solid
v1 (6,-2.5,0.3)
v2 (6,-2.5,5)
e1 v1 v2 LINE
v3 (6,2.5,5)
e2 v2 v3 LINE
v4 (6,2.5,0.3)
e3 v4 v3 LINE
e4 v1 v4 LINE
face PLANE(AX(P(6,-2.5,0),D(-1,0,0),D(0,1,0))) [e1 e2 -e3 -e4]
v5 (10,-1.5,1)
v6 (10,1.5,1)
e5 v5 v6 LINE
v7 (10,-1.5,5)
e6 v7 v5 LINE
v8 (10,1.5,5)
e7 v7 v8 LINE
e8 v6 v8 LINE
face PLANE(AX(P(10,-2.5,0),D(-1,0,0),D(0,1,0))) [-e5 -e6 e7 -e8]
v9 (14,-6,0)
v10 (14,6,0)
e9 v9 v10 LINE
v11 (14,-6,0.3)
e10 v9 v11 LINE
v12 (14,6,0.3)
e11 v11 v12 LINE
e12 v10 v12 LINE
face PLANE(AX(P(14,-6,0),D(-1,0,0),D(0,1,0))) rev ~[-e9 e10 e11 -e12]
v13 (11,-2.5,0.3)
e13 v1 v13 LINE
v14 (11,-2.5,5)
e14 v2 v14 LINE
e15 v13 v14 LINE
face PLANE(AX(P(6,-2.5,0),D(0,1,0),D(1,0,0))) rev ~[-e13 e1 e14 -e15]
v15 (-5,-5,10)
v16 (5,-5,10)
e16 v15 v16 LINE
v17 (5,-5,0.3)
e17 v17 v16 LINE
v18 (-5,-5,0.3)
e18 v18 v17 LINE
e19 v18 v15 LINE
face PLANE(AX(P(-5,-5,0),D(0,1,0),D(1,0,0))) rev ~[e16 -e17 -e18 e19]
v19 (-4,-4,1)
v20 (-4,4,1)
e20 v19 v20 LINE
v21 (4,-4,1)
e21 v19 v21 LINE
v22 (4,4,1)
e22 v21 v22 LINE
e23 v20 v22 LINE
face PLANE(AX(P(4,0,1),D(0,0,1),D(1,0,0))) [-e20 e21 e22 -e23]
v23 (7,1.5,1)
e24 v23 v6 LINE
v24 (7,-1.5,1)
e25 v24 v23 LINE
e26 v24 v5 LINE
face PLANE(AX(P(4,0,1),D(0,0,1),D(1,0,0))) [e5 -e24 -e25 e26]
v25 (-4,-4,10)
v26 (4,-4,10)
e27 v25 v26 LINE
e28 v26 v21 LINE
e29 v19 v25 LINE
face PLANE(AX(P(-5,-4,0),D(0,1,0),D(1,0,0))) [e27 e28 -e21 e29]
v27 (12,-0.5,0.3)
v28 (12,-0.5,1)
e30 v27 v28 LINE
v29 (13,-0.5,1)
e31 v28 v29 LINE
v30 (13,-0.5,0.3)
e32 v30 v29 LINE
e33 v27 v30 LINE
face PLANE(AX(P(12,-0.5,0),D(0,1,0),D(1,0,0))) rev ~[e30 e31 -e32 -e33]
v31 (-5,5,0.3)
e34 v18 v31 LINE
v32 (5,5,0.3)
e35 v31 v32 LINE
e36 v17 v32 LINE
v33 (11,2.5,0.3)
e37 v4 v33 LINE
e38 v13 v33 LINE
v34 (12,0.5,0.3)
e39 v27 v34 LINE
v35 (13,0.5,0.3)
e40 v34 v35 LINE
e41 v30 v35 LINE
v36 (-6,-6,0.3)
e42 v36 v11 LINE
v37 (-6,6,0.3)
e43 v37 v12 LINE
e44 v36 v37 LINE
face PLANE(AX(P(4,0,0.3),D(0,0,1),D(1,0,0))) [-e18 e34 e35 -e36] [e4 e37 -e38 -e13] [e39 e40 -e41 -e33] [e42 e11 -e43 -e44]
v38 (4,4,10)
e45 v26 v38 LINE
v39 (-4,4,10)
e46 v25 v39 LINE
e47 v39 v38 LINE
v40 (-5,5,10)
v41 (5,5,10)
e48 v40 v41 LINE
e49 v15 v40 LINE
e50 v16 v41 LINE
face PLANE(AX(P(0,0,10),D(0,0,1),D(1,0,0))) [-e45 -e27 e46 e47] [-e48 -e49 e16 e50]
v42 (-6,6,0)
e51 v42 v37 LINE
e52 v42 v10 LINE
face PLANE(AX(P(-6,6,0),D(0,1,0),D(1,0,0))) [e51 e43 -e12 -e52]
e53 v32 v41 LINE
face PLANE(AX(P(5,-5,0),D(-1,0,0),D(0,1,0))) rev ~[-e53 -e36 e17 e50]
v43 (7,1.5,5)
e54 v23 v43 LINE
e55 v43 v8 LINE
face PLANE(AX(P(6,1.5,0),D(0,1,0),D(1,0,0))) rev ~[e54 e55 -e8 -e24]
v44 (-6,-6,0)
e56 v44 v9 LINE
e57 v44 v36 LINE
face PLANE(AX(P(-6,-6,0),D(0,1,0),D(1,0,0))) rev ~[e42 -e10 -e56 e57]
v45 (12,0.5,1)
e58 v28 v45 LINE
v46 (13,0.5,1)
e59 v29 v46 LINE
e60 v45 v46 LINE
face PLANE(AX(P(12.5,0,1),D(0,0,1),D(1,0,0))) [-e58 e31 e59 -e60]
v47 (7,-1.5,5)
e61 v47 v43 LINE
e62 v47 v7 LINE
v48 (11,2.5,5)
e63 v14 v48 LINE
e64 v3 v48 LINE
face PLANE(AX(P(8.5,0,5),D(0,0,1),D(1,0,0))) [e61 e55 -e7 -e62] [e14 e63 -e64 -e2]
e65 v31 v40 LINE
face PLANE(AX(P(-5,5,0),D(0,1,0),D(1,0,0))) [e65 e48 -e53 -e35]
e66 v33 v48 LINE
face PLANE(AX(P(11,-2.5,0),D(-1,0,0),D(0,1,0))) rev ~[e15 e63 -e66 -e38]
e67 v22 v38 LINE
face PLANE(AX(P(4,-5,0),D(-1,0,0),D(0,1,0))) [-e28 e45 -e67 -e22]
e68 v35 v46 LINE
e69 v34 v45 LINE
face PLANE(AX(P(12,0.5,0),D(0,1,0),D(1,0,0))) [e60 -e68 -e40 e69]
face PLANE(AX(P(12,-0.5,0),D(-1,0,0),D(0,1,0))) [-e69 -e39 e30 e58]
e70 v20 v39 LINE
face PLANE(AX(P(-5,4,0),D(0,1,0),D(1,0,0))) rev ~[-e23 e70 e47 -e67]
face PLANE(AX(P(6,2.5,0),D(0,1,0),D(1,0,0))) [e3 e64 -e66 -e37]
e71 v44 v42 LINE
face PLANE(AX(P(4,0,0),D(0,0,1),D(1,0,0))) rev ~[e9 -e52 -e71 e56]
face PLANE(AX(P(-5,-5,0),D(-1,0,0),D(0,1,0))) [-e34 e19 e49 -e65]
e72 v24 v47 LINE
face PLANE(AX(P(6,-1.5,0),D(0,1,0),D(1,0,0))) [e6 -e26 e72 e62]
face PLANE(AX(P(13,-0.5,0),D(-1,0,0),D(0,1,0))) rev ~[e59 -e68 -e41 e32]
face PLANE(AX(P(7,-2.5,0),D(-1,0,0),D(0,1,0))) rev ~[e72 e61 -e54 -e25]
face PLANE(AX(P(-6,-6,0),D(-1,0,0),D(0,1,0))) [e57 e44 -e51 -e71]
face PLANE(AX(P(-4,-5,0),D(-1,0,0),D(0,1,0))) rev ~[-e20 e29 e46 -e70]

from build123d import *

# Parameters (mm, degrees)
F0_W         = 10
F0_H         = 10
F1_DEPTH     = 10
F0_W_2       = 5
F0_H_2       = 5
F2_DEPTH     = 5
F0_W_3       = 1
F0_H_3       = 1
F3_DEPTH     = 1
F0_W_4       = 20
F0_H_4       = 12
F4_DEPTH     = 0.3
F5_T         = 1
F5_T3_DEPTH  = 3
F5_T5_DEPTH  = 12
F5_T7_DEPTH  = 12
F5_T9_DEPTH  = 7
F5_T11_DEPTH = 7
F5_T13_DEPTH = 3


# Not quite as in the source:
# - a shell that OpenCascade refuses in one call is made with other operations: the cavity is built on its own and cut out


with BuildPart() as f1:
    # F0 (on Top) → F1 (new body)
    with BuildSketch(Plane.XY):
        Rectangle(F0_W, F0_H)
    extrude(amount=F1_DEPTH)



with BuildPart() as f2:
    # F0 (on Top) → F2 (new body)
    with BuildSketch(Plane.XY):
        with Locations((8.5, 0)):
            Rectangle(F0_W_2, F0_H_2)
    extrude(amount=F2_DEPTH)


with BuildPart() as f3:
    # F0 (on Top) → F3 (new body)
    with BuildSketch(Plane.XY):
        with Locations((12.5, 0)):
            Rectangle(F0_W_3, F0_H_3)
    extrude(amount=F3_DEPTH)


with BuildPart() as f1_1:
    add(f1.part)

    add(f2.part)  # F4 merges F2

    add(f3.part)  # F4 merges F3
    # F0 (on Top) → F4 (join)
    with BuildSketch(Plane.XY):
        with Locations((4, 0)):
            Rectangle(F0_W_4, F0_H_4)
        Rectangle(F0_W, F0_H, mode=Mode.SUBTRACT)
        with Locations((8.5, 0)):
            Rectangle(F0_W_2, F0_H_2, mode=Mode.SUBTRACT)
        with Locations((12.5, 0)):
            Rectangle(F0_W_3, F0_H_3, mode=Mode.SUBTRACT)
    extrude(amount=F4_DEPTH)

    # F5: shell of thickness 1, made by hand


with BuildPart() as f5_core1:
    # F5_t2: copy of F1
    add(f1_1.part)

    # the walls: a layer under each face that stays
    f5_faces = [f5_core1.faces().sort_by_distance(p)[0] for p in [
        (13, 0, 0.65),
        (10.6666666667, -4, 0.3),
        (12.5, 0.5, 0.65),
        (12.5, -0.5, 0.65),
        (4, 6, 0.15),
        (-6, 0, 0.15),
        (4, -6, 0.15),
        (14, 0, 0.15),
        (0, 5, 5.15),
        (5, 0, 5.15),
        (0, -5, 5.15),
        (-5, 0, 5.15),
        (8.5, 2.5, 2.65),
        (11, 0, 2.65),
        (8.5, -2.5, 2.65),
        (6, 0, 2.65),
        (12, 0, 0.65),
        (4, 0, 0),
    ]]
    thicken(f5_faces, amount=-F5_T, mode=Mode.SUBTRACT)

    # F5_s4 → F5_t3 (cut)
    with BuildSketch(Plane.XZ.offset(-1.5)):
        Polygon((13.01, 0.31), (12, 0.3), (12, -0.7), (13, -0.7), align=None)
        Polygon((11.99, 0.31), (12, -0.7), (13, -0.7), (13, 0.3), align=None)
    extrude(amount=F5_T3_DEPTH, mode=Mode.SUBTRACT)

    # F5_s6 → F5_t5 (cut)
    with BuildSketch(Plane.YZ.offset(-6)):
        Polygon((5.01, 0.31), (5, -0.7), (4, -0.7), (4, 0.3), align=None)
        Polygon((-5.01, 0.31), (-5, -0.7), (-4, -0.7), (-4, 0.3), align=None)
    extrude(amount=F5_T5_DEPTH, mode=Mode.SUBTRACT)

    # F5_s8 → F5_t7 (cut)
    with BuildSketch(Plane.XZ.offset(-6)):
        Polygon((5.01, 0.31), (5, -0.7), (4, -0.7), (4, 0.3), align=None)
        Polygon((-5.01, 0.31), (-5, -0.7), (-4, -0.7), (-4, 0.3), align=None)
    extrude(amount=F5_T7_DEPTH, mode=Mode.SUBTRACT)

    # F5_s10 → F5_t9 (cut)
    with BuildSketch(Plane.YZ.offset(5)):
        Polygon((2.51, 0.31), (2.5, -0.7), (1.5, -0.7), (1.5, 0.3), align=None)
        Polygon((-2.51, 0.31), (-2.5, -0.7), (-1.5, -0.7), (-1.5, 0.3), align=None)
    extrude(amount=F5_T9_DEPTH, mode=Mode.SUBTRACT)

    # F5_s12 → F5_t11 (cut)
    with BuildSketch(Plane.XZ.offset(-3.5)):
        Polygon((11.01, 0.31), (11, -0.7), (10, -0.7), (10, 0.3), align=None)
        Polygon((5.99, 0.31), (6, -0.7), (7, -0.7), (7, 0.3), align=None)
    extrude(amount=F5_T11_DEPTH, mode=Mode.SUBTRACT)

    # F5_s14 → F5_t13 (cut)
    with BuildSketch(Plane.YZ.offset(11)):
        Polygon((0.51, 0.31), (0.5, -0.7), (-0.5, -0.7), (-0.5, 0.3), align=None)
        Polygon((-0.51, 0.31), (-0.5, -0.7), (0.5, -0.7), (0.5, 0.3), align=None)
    extrude(amount=F5_T13_DEPTH, mode=Mode.SUBTRACT)


with BuildPart() as f1_2:
    add(f1_1.part)

    # what is left inside the walls is the cavity
    f5_cavity = [f5_core1.part.solids().sort_by_distance(p)[0] for p in [
        (3.99, 0, 7),
        (8.5, 1.49, 3.666667),
    ]]
    add(f5_cavity, mode=Mode.SUBTRACT)


solid = f1_2.part
